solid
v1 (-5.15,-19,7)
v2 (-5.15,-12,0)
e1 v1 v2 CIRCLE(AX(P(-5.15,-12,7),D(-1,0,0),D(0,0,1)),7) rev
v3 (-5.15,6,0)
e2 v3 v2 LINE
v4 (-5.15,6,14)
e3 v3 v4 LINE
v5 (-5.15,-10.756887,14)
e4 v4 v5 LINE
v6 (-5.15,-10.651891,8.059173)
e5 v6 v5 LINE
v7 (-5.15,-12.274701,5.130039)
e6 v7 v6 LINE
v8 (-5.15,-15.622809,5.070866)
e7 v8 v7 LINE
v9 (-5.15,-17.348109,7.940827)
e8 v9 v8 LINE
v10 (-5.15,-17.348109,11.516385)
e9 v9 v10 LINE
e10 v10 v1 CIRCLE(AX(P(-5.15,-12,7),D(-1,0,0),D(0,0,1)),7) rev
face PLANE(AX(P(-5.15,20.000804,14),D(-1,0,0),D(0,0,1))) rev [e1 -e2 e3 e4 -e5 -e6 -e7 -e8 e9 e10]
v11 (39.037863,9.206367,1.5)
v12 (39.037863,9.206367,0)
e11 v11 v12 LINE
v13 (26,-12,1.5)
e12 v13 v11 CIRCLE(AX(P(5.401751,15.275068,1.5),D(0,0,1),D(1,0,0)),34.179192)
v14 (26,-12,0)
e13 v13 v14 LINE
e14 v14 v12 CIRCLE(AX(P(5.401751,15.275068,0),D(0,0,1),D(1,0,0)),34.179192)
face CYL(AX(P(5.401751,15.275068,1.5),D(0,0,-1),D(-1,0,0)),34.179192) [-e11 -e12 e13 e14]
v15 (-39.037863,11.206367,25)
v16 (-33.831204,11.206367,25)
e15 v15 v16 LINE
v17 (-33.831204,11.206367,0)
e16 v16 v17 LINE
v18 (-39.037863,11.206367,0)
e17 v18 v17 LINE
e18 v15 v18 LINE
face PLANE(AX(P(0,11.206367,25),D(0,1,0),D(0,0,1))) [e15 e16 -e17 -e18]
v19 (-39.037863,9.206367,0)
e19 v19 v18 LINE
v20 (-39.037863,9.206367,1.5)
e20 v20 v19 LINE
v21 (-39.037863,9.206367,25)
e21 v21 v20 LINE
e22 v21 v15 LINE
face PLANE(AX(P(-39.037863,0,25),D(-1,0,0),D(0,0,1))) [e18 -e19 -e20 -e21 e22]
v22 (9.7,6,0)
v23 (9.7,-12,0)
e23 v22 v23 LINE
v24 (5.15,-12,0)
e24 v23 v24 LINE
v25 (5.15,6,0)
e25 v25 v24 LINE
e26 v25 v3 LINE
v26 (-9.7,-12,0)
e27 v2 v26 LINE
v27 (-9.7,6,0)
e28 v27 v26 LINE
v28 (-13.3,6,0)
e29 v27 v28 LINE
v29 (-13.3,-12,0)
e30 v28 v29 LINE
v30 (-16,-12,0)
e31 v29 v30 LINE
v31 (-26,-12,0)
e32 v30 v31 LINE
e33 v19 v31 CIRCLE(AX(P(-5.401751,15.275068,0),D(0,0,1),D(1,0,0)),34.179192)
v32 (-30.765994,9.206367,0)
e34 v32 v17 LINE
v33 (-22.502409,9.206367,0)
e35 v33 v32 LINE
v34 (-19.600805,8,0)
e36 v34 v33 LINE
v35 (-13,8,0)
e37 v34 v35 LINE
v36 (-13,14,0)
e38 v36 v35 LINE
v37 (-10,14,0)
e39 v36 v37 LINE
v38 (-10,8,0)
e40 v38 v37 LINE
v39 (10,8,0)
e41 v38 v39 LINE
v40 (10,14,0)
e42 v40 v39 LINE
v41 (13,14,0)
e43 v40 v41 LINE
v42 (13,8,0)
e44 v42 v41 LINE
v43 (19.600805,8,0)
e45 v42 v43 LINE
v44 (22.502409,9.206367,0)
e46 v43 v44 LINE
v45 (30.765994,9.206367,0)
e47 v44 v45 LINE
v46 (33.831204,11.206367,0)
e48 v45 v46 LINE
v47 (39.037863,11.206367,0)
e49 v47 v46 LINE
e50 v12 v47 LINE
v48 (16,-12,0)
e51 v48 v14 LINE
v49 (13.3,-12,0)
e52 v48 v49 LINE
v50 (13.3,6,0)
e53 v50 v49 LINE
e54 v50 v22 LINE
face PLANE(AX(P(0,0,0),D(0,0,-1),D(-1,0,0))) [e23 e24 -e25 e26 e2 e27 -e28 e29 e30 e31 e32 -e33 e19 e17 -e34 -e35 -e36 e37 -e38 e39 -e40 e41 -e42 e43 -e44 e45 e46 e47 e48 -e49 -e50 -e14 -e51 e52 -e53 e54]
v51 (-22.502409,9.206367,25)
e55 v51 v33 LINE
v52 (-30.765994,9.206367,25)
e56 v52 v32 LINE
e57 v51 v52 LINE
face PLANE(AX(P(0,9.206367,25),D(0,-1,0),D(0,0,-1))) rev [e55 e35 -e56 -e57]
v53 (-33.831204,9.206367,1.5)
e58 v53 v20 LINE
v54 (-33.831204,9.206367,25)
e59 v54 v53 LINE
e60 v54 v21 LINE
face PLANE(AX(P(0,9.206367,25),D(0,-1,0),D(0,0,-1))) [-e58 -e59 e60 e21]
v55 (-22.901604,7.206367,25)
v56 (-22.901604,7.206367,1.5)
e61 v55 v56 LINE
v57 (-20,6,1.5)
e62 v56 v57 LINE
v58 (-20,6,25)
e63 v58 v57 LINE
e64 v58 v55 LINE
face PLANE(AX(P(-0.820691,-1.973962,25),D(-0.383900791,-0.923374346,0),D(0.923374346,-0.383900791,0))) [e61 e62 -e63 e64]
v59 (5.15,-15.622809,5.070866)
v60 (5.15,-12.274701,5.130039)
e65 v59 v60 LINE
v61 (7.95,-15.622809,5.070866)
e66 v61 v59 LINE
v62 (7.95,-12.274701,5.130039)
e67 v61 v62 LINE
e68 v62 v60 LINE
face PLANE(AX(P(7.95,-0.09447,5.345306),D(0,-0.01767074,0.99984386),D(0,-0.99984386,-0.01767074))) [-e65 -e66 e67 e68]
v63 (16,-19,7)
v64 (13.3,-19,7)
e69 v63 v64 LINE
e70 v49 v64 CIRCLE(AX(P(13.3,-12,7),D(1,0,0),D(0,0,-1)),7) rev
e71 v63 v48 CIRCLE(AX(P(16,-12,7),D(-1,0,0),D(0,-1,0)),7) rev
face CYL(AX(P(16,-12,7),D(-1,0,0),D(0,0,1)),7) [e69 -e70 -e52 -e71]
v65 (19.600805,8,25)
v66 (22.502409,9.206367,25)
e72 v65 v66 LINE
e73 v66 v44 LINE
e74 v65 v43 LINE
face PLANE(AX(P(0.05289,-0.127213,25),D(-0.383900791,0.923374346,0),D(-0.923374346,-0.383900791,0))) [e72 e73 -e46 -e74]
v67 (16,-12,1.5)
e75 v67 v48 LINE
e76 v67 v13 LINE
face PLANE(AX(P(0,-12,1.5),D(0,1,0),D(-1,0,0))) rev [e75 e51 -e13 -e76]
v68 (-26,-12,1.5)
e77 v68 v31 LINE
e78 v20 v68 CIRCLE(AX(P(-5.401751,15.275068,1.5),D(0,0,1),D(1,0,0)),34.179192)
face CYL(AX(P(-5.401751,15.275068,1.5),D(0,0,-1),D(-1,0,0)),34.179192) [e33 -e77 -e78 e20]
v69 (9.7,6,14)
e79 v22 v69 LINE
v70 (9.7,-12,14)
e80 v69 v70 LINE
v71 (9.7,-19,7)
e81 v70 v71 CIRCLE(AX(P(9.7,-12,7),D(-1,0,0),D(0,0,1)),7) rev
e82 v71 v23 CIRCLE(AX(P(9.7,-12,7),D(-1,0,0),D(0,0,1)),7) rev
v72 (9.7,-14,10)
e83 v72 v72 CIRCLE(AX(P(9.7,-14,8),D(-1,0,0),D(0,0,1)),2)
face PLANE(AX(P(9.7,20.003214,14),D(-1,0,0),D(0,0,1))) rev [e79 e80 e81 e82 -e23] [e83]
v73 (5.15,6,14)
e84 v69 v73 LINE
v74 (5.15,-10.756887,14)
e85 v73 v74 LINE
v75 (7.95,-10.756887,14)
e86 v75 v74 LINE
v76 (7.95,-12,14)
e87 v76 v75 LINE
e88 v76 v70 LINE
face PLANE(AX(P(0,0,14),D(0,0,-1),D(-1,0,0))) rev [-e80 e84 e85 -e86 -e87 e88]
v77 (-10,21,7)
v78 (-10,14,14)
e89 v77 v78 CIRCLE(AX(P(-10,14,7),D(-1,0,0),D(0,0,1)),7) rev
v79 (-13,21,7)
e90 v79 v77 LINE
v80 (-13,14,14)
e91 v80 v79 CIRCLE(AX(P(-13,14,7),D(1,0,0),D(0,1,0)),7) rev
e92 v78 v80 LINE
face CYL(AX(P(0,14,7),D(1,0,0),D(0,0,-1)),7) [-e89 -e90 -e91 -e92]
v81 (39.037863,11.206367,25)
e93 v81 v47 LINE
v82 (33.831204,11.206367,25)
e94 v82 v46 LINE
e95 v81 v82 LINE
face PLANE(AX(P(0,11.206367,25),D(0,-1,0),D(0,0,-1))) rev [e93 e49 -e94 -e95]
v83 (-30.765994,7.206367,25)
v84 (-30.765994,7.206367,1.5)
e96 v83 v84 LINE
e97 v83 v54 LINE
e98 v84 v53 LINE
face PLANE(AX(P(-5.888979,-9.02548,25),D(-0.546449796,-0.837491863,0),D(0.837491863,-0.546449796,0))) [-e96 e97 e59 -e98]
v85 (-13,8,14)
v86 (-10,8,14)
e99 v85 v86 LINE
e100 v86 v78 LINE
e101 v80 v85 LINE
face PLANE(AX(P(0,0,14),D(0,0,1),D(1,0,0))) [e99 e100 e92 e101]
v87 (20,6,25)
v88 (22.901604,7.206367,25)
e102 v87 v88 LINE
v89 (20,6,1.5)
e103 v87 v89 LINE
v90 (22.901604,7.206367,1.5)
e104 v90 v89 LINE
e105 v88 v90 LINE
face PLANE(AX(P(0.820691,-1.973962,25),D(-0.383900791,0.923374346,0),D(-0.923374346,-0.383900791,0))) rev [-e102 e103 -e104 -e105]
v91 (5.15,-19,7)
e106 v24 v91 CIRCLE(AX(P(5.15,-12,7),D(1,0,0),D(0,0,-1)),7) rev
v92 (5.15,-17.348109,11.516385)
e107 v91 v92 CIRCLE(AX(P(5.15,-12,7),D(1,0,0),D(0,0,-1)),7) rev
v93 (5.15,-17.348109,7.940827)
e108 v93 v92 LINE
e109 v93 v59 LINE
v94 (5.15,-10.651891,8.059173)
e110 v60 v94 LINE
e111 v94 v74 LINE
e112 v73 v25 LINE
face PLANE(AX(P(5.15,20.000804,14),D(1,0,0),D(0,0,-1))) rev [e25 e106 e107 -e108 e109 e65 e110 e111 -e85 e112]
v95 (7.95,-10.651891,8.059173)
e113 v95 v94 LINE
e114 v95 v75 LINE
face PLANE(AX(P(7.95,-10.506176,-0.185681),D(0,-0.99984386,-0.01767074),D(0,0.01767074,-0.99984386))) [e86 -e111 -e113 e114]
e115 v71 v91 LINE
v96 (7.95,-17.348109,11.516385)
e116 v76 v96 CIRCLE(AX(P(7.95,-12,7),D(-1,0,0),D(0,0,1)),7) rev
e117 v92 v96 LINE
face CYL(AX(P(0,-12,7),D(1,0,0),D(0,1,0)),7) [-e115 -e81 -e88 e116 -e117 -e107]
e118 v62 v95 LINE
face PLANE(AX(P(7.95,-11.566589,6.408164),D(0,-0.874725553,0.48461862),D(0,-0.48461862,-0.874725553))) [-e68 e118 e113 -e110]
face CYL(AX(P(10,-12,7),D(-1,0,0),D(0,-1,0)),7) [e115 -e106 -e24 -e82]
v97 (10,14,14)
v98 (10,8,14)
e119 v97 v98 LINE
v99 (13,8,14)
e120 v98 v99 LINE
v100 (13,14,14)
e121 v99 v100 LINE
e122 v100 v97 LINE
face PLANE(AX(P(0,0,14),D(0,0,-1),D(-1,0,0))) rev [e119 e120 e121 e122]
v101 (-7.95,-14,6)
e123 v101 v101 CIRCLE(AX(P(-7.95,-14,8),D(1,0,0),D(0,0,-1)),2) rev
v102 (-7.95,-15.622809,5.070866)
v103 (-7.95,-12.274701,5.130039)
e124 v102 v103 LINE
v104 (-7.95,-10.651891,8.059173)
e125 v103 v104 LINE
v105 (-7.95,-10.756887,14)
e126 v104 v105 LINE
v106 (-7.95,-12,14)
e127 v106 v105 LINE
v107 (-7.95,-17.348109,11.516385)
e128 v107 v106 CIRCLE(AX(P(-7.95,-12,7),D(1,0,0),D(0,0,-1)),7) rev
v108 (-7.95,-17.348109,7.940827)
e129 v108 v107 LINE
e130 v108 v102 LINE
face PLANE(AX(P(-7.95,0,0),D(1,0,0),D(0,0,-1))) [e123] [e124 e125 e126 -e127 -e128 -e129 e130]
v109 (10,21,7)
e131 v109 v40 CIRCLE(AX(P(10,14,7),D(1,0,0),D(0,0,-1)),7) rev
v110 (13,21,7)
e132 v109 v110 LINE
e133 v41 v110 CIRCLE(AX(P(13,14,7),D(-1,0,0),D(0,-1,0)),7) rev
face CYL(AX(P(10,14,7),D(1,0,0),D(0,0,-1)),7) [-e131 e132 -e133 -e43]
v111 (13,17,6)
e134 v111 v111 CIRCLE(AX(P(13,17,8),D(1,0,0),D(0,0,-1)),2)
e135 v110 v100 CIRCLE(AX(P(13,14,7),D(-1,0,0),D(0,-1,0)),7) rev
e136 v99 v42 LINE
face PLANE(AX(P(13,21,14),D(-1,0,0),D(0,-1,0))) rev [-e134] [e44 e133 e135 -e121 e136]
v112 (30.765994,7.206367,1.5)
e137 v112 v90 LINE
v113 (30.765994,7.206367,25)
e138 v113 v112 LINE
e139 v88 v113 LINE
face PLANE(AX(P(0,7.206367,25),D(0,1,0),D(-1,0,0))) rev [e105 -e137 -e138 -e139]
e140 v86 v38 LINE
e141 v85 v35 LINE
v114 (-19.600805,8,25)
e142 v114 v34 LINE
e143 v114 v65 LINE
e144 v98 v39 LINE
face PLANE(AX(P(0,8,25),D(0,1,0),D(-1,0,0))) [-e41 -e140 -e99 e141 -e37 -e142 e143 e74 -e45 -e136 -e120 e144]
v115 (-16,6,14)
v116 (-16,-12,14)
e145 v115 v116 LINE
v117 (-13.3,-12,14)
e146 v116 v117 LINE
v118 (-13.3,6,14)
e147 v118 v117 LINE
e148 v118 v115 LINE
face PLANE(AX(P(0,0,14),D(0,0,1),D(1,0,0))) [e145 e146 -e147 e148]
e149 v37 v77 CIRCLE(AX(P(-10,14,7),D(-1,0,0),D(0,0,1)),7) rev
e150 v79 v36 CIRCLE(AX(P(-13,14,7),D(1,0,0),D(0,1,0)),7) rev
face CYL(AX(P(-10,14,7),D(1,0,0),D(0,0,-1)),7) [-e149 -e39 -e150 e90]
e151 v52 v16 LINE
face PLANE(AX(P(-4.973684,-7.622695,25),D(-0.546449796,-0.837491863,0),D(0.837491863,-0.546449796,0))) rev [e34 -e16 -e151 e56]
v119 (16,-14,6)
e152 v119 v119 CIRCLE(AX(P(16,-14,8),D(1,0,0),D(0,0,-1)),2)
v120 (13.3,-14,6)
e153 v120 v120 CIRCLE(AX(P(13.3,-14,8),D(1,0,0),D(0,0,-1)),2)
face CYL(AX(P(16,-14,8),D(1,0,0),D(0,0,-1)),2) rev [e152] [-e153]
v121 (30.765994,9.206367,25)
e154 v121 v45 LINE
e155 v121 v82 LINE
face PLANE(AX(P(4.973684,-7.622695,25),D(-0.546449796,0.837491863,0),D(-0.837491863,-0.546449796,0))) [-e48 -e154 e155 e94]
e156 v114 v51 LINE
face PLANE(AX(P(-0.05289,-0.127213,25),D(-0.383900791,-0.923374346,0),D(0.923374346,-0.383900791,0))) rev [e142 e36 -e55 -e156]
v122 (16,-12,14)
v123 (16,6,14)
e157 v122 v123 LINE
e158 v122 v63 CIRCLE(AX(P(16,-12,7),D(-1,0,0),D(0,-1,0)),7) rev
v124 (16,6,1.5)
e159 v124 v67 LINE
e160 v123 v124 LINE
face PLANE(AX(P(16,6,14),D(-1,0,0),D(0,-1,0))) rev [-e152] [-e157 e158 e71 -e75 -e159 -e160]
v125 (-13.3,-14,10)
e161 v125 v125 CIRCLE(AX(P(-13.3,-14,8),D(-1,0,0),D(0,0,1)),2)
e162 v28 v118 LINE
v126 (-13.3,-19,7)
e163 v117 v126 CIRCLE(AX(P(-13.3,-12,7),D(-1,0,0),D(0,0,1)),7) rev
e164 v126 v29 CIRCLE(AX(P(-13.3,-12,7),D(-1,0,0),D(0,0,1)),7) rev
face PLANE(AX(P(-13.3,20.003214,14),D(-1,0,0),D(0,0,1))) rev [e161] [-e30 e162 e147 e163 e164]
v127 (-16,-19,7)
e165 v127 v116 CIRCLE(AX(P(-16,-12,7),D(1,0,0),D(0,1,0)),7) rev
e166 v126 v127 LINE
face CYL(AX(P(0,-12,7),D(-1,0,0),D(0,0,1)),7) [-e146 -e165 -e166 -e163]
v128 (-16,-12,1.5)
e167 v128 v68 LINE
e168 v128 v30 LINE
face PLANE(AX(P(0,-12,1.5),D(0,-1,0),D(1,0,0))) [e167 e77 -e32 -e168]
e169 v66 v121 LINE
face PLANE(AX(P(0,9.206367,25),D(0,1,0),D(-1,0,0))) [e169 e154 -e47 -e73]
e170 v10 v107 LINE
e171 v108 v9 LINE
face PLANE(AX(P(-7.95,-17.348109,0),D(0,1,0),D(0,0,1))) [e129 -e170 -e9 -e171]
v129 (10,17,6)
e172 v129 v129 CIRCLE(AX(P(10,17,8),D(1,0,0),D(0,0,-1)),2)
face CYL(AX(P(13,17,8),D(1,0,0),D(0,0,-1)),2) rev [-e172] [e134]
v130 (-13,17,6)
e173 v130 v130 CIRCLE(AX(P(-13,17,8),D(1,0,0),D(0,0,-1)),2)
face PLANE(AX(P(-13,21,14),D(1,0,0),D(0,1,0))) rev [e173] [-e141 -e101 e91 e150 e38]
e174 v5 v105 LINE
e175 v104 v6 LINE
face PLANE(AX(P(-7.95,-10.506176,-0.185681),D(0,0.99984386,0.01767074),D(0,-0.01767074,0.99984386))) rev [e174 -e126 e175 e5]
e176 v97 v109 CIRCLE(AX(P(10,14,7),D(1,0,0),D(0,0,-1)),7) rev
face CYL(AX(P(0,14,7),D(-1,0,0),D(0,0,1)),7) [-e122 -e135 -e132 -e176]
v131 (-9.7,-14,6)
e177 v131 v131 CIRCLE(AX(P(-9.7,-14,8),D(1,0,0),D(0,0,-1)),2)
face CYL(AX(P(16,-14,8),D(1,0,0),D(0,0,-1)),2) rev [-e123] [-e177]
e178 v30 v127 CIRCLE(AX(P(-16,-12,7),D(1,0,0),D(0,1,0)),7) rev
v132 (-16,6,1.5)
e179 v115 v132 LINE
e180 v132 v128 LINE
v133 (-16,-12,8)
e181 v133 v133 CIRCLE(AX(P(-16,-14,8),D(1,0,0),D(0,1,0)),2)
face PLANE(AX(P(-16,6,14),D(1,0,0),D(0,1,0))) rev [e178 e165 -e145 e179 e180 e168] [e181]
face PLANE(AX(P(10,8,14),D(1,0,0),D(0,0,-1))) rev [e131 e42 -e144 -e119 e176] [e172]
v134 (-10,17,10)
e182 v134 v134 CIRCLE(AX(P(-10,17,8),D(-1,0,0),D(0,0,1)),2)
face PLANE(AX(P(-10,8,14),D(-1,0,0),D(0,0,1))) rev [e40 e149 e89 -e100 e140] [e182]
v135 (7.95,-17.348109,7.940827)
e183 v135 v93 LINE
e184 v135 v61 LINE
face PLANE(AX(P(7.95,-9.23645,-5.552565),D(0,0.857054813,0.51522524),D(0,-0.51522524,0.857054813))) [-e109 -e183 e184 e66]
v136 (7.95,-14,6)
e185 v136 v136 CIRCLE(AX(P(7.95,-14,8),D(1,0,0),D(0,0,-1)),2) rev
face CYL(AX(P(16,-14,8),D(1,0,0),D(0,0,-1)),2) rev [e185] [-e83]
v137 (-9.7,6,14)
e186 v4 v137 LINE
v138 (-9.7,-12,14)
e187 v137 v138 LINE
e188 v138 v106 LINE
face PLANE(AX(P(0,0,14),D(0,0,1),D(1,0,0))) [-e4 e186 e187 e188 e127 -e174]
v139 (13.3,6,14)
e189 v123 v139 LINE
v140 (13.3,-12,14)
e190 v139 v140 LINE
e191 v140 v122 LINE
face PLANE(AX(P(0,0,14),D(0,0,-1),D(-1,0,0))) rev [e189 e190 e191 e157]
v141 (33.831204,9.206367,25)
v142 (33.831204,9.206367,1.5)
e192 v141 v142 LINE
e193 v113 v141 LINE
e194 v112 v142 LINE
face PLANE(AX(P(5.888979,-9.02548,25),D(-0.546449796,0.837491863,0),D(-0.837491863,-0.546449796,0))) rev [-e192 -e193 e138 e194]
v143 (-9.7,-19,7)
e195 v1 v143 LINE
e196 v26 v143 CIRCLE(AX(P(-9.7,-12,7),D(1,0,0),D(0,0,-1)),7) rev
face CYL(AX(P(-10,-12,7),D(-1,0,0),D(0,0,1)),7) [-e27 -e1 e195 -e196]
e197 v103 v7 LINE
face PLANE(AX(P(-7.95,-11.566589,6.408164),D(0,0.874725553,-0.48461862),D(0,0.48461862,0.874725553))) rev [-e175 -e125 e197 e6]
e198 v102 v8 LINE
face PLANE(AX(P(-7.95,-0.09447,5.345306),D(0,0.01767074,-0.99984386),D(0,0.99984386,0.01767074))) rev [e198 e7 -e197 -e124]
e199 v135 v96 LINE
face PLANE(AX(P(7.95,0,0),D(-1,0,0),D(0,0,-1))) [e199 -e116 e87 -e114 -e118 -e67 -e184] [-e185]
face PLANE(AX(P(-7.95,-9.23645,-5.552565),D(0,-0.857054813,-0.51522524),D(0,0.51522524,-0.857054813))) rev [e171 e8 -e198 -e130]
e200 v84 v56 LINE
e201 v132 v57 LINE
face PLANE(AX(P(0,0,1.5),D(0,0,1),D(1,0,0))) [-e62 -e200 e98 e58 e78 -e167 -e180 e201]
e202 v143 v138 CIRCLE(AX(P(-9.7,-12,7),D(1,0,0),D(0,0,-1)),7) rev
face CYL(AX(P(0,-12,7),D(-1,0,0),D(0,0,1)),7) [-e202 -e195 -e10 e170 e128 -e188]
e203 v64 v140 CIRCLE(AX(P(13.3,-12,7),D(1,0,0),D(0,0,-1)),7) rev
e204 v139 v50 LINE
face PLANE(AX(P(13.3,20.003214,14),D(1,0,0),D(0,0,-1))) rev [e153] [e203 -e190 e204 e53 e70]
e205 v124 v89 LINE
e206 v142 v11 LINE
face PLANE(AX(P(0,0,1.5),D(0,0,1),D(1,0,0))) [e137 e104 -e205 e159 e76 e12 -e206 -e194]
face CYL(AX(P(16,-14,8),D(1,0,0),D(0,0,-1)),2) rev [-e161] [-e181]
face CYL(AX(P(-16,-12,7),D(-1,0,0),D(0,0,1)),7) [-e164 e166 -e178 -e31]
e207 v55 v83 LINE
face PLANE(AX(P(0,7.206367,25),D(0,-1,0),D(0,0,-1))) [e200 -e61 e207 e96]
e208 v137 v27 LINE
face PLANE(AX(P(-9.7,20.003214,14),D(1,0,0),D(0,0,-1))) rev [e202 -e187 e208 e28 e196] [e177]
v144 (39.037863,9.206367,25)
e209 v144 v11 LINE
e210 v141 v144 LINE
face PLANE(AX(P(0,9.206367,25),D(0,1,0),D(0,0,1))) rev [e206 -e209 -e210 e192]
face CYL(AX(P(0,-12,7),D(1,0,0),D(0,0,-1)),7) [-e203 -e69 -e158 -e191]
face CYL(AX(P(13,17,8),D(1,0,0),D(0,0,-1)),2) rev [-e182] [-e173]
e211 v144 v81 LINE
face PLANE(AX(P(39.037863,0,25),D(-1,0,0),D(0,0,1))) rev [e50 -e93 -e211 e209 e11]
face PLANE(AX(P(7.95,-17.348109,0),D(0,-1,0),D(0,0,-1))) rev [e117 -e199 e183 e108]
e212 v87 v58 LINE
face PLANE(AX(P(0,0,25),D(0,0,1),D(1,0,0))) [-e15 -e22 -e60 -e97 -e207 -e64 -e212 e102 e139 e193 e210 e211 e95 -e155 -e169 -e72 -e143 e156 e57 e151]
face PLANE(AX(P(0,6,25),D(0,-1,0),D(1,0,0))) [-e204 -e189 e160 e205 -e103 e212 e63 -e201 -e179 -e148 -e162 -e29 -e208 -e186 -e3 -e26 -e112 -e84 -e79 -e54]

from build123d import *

# Parameters (mm, degrees)
SKETCH2_W                 = 5
SKETCH2_H                 = 25
BOSS_EXTRUDE1_DEPTH       = 14
BOSS_EXTRUDE1_2_DEPTH     = 14
BOSS_EXTRUDE3_DEPTH       = 25
SKETCH5_W                 = 3
SKETCH5_H                 = 13
BOSS_EXTRUDE4_DEPTH       = 14
SKETCH7_W                 = 3
SKETCH7_H                 = 25
BOSS_EXTRUDE5_DEPTH       = 14
SKETCH15_W                = 0.3
SKETCH15_H                = 14
CUT_EXTRUDE2_DEPTH        = 25
SKETCH16_W                = 0.15
SKETCH16_H                = 14
CUT_EXTRUDE3_DEPTH        = 25
FILLET1_R                 = 7
F_4_0MM_DOWEL_HOLE2_D     = 4
FILLET2_R                 = 7
F_4_0MM_DOWEL_HOLE1_D     = 4
F_4_0MM_DOWEL_HOLE1_DEPTH = 26
F_4_0MM_DOWEL_HOLE1_TIP   = 1.201721238
BOSS_EXTRUDE6_DEPTH       = 1.5
CUT_EXTRUDE4_START        = -2.8
SKETCH18_R                = 2
CUT_EXTRUDE4_DEPTH        = 2.8


with BuildPart() as part:
    # Sketch2 → Boss-Extrude1 (new body)
    with BuildSketch(Plane.XY):
        with Locations((-7.5, -6.5)):
            Rectangle(SKETCH2_W, SKETCH2_H)
    extrude(amount=BOSS_EXTRUDE1_DEPTH)



with BuildPart() as body_2:
    # Sketch2 → Boss-Extrude1 2 (new body)
    with BuildSketch(Plane.XY):
        with Locations((7.5, -6.5)):
            Rectangle(SKETCH2_W, SKETCH2_H)
    extrude(amount=BOSS_EXTRUDE1_2_DEPTH)


with BuildPart() as part_1:
    add(part.part)

    add(body_2.part)  # Boss-Extrude3 merges body 2
    # Sketch4 → Boss-Extrude3 (add)
    with BuildSketch(Plane.XY):
        Polygon((-26, 9.206366686), (-30.765993712, 9.206366686), (-33.831204342, 11.206366686), (-39.037863495, 11.206366686), (-39.037863495, 9.206366686), (-33.831204342, 9.206366686), (-30.765993712, 7.206366686), (-26, 7.206366686), align=None)
        Polygon((22.901603942, 7.206366686), (26, 7.206366686), (26, 9.206366686), (22.502408858, 9.206366686), (19.600804916, 8), (10, 8), (-10, 8), (-19.600804916, 8), (-22.502408858, 9.206366686), (-26, 9.206366686), (-26, 7.206366686), (-22.901603942, 7.206366686), (-20, 6), (-10, 6), (10, 6), (20, 6), align=None)
        Polygon((26, 7.206366686), (26, 9.206366686), (30.765993712, 9.206366686), (33.831204342, 11.206366686), (39.037863495, 11.206366686), (39.037863495, 9.206366686), (33.831204342, 9.206366686), (30.765993712, 7.206366686), align=None)
    extrude(amount=BOSS_EXTRUDE3_DEPTH)

    # Sketch5 → Boss-Extrude4 (add)
    with BuildSketch(Plane.XY):
        with Locations((-11.5, 14.5)):
            Rectangle(SKETCH5_W, SKETCH5_H)
        with Locations((11.5, 14.5)):
            Rectangle(SKETCH5_W, SKETCH5_H)
    extrude(amount=BOSS_EXTRUDE4_DEPTH)

    # Sketch7 → Boss-Extrude5 (add)
    with BuildSketch(Plane.XY):
        with Locations((-14.5, -6.5)):
            Rectangle(SKETCH7_W, SKETCH7_H)
        with Locations((14.5, -6.5)):
            Rectangle(SKETCH7_W, SKETCH7_H)
    extrude(amount=BOSS_EXTRUDE5_DEPTH)

    # Sketch15 → Cut-Extrude2 (cut)
    with BuildSketch(Plane.XZ.offset(19)):
        with Locations((-9.85, 7)):
            Rectangle(SKETCH15_W, SKETCH15_H)
        with Locations((9.85, 7)):
            Rectangle(SKETCH15_W, SKETCH15_H)
        with Locations((-13.15, 7)):
            Rectangle(SKETCH15_W, SKETCH15_H)
        with Locations((13.15, 7)):
            Rectangle(SKETCH15_W, SKETCH15_H)
    extrude(amount=-CUT_EXTRUDE2_DEPTH, mode=Mode.SUBTRACT)

    # Sketch16 → Cut-Extrude3 (cut)
    with BuildSketch(Plane.XZ.offset(19)):
        with Locations((-5.075, 7)):
            Rectangle(SKETCH16_W, SKETCH16_H)
        with Locations((5.075, 7)):
            Rectangle(SKETCH16_W, SKETCH16_H)
    extrude(amount=-CUT_EXTRUDE3_DEPTH, mode=Mode.SUBTRACT)

    # Fillet1
    fillet1_edges = [part_1.edges().sort_by_distance(p)[0] for p in [
        (7.425, -19, 14),
        (7.425, -19, 0),
        (-7.425, -19, 0),
        (-7.425, -19, 14),
        (-14.65, -19, 0),
        (-14.65, -19, 14),
        (14.65, -19, 14),
        (14.65, -19, 0),
    ]]
    fillet(fillet1_edges, radius=FILLET1_R - 0.0001)  # a hair under: the kernel refuses the full size

    # Ø4.0mm Dowel Hole2 (through all)
    with Locations(Plane(origin=(16, 0, 0), x_dir=(0, 0, -1), z_dir=(1, 0, 0))):
        with Locations((-8, -14)):
            Hole(F_4_0MM_DOWEL_HOLE2_D / 2)

    # Fillet2
    fillet2_edges = [part_1.edges().sort_by_distance(p)[0] for p in [
        (-11.5, 21, 0),
        (-11.5, 21, 14),
        (11.5, 21, 0),
        (11.5, 21, 14),
    ]]
    fillet(fillet2_edges, radius=FILLET2_R - 0.0001)  # a hair under: the kernel refuses the full size

    # Ø4.0mm Dowel Hole1
    with Locations(Plane(origin=(13, 0, 0), x_dir=(0, 0, -1), z_dir=(1, 0, 0))):
        with Locations((-8, 17)):
            Hole(F_4_0MM_DOWEL_HOLE1_D / 2, depth=F_4_0MM_DOWEL_HOLE1_DEPTH)
            with Locations((0, 0, -(F_4_0MM_DOWEL_HOLE1_DEPTH + F_4_0MM_DOWEL_HOLE1_TIP / 2))):  # 118° drill point
                Cone(0, F_4_0MM_DOWEL_HOLE1_D / 2, F_4_0MM_DOWEL_HOLE1_TIP, mode=Mode.SUBTRACT)

    # Sketch14 → Boss-Extrude6 (add)
    with BuildSketch(Plane.XY):
        with BuildLine():
            Line((-22.901603942, 7.206366686), (-30.765993712, 7.206366686))
            Line((-30.765993712, 7.206366686), (-33.831204342, 9.206366686))
            Line((-33.831204342, 9.206366686), (-39.037863495, 9.206366686))
            ThreePointArc((-39.037863495, 9.206366686), (-34.518223809, -2.625999259), (-26, -12))
            Line((-26, -12), (-16, -12))
            Line((-16, -12), (-16, 6))
            Line((-16, 6), (-20, 6))
            Line((-20, 6), (-22.901603942, 7.206366686))
        make_face()
        with BuildLine():
            Line((20, 6), (16, 6))
            Line((16, 6), (16, -12))
            Line((16, -12), (26, -12))
            ThreePointArc((26, -12), (34.518223809, -2.625999259), (39.037863495, 9.206366686))
            Line((39.037863495, 9.206366686), (33.831204342, 9.206366686))
            Line((33.831204342, 9.206366686), (30.765993712, 7.206366686))
            Line((30.765993712, 7.206366686), (22.901603942, 7.206366686))
            Line((22.901603942, 7.206366686), (20, 6))
        make_face()
    extrude(amount=BOSS_EXTRUDE6_DEPTH)

    # Sketch18 → Cut-Extrude4 (cut)
    # profile 1 of 3: a face of its own
    with BuildSketch(Plane(origin=(-5.15, 0, 0), x_dir=(0, 0, -1), z_dir=(1, 0, 0)).offset(CUT_EXTRUDE4_START)):
        Polygon((-7.940827202, -17.348108707), (-5.070866406, -15.622809207), (-5.130039204, -12.2747005), (-8.059172798, -10.651891293), (-10.929133594, -12.377190793), (-10.869960796, -15.7252995), align=None)
        with Locations((-8, -14)):
            Circle(SKETCH18_R, mode=Mode.SUBTRACT)
    # profile 2 of 3: a face of its own
    with BuildSketch(Plane(origin=(-5.15, 0, 0), x_dir=(0, 0, -1), z_dir=(1, 0, 0)).offset(CUT_EXTRUDE4_START)):
        with BuildLine():
            Line((-22.212279743, -17.348108707), (-11.516384977, -17.348108707))
            ThreePointArc((-11.516384977, -17.348108707), (-13.348806771, -14.948330474), (-14, -12))
            Line((-14, -12), (-14, -10.7568865))
            Line((-14, -10.7568865), (-22.212279743, -10.902026223))
            Line((-22.212279743, -10.902026223), (-22.212279743, -17.348108707))
        make_face()
    # profile 3 of 3: a face of its own
    with BuildSketch(Plane(origin=(-5.15, 0, 0), x_dir=(0, 0, -1), z_dir=(1, 0, 0)).offset(CUT_EXTRUDE4_START)):
        with BuildLine():
            Line((-11.516384977, -17.348108707), (-7.940827202, -17.348108707))
            Line((-7.940827202, -17.348108707), (-10.869960796, -15.7252995))
            Line((-10.869960796, -15.7252995), (-10.929133594, -12.377190793))
            Line((-10.929133594, -12.377190793), (-8.059172798, -10.651891293))
            Line((-8.059172798, -10.651891293), (-14, -10.7568865))
            Line((-14, -10.7568865), (-14, -12))
            ThreePointArc((-14, -12), (-13.348806771, -14.948330474), (-11.516384977, -17.348108707))
        make_face()
    cut_extrude4 = extrude(amount=CUT_EXTRUDE4_DEPTH, mode=Mode.SUBTRACT)

    # Mirror1: Cut-Extrude4 across plane
    add(cut_extrude4.mirror(Plane(origin=(0, 0, 0), x_dir=(0, 0, 1), z_dir=(1, 0, 0))), mode=Mode.SUBTRACT)


solid = part_1.part
